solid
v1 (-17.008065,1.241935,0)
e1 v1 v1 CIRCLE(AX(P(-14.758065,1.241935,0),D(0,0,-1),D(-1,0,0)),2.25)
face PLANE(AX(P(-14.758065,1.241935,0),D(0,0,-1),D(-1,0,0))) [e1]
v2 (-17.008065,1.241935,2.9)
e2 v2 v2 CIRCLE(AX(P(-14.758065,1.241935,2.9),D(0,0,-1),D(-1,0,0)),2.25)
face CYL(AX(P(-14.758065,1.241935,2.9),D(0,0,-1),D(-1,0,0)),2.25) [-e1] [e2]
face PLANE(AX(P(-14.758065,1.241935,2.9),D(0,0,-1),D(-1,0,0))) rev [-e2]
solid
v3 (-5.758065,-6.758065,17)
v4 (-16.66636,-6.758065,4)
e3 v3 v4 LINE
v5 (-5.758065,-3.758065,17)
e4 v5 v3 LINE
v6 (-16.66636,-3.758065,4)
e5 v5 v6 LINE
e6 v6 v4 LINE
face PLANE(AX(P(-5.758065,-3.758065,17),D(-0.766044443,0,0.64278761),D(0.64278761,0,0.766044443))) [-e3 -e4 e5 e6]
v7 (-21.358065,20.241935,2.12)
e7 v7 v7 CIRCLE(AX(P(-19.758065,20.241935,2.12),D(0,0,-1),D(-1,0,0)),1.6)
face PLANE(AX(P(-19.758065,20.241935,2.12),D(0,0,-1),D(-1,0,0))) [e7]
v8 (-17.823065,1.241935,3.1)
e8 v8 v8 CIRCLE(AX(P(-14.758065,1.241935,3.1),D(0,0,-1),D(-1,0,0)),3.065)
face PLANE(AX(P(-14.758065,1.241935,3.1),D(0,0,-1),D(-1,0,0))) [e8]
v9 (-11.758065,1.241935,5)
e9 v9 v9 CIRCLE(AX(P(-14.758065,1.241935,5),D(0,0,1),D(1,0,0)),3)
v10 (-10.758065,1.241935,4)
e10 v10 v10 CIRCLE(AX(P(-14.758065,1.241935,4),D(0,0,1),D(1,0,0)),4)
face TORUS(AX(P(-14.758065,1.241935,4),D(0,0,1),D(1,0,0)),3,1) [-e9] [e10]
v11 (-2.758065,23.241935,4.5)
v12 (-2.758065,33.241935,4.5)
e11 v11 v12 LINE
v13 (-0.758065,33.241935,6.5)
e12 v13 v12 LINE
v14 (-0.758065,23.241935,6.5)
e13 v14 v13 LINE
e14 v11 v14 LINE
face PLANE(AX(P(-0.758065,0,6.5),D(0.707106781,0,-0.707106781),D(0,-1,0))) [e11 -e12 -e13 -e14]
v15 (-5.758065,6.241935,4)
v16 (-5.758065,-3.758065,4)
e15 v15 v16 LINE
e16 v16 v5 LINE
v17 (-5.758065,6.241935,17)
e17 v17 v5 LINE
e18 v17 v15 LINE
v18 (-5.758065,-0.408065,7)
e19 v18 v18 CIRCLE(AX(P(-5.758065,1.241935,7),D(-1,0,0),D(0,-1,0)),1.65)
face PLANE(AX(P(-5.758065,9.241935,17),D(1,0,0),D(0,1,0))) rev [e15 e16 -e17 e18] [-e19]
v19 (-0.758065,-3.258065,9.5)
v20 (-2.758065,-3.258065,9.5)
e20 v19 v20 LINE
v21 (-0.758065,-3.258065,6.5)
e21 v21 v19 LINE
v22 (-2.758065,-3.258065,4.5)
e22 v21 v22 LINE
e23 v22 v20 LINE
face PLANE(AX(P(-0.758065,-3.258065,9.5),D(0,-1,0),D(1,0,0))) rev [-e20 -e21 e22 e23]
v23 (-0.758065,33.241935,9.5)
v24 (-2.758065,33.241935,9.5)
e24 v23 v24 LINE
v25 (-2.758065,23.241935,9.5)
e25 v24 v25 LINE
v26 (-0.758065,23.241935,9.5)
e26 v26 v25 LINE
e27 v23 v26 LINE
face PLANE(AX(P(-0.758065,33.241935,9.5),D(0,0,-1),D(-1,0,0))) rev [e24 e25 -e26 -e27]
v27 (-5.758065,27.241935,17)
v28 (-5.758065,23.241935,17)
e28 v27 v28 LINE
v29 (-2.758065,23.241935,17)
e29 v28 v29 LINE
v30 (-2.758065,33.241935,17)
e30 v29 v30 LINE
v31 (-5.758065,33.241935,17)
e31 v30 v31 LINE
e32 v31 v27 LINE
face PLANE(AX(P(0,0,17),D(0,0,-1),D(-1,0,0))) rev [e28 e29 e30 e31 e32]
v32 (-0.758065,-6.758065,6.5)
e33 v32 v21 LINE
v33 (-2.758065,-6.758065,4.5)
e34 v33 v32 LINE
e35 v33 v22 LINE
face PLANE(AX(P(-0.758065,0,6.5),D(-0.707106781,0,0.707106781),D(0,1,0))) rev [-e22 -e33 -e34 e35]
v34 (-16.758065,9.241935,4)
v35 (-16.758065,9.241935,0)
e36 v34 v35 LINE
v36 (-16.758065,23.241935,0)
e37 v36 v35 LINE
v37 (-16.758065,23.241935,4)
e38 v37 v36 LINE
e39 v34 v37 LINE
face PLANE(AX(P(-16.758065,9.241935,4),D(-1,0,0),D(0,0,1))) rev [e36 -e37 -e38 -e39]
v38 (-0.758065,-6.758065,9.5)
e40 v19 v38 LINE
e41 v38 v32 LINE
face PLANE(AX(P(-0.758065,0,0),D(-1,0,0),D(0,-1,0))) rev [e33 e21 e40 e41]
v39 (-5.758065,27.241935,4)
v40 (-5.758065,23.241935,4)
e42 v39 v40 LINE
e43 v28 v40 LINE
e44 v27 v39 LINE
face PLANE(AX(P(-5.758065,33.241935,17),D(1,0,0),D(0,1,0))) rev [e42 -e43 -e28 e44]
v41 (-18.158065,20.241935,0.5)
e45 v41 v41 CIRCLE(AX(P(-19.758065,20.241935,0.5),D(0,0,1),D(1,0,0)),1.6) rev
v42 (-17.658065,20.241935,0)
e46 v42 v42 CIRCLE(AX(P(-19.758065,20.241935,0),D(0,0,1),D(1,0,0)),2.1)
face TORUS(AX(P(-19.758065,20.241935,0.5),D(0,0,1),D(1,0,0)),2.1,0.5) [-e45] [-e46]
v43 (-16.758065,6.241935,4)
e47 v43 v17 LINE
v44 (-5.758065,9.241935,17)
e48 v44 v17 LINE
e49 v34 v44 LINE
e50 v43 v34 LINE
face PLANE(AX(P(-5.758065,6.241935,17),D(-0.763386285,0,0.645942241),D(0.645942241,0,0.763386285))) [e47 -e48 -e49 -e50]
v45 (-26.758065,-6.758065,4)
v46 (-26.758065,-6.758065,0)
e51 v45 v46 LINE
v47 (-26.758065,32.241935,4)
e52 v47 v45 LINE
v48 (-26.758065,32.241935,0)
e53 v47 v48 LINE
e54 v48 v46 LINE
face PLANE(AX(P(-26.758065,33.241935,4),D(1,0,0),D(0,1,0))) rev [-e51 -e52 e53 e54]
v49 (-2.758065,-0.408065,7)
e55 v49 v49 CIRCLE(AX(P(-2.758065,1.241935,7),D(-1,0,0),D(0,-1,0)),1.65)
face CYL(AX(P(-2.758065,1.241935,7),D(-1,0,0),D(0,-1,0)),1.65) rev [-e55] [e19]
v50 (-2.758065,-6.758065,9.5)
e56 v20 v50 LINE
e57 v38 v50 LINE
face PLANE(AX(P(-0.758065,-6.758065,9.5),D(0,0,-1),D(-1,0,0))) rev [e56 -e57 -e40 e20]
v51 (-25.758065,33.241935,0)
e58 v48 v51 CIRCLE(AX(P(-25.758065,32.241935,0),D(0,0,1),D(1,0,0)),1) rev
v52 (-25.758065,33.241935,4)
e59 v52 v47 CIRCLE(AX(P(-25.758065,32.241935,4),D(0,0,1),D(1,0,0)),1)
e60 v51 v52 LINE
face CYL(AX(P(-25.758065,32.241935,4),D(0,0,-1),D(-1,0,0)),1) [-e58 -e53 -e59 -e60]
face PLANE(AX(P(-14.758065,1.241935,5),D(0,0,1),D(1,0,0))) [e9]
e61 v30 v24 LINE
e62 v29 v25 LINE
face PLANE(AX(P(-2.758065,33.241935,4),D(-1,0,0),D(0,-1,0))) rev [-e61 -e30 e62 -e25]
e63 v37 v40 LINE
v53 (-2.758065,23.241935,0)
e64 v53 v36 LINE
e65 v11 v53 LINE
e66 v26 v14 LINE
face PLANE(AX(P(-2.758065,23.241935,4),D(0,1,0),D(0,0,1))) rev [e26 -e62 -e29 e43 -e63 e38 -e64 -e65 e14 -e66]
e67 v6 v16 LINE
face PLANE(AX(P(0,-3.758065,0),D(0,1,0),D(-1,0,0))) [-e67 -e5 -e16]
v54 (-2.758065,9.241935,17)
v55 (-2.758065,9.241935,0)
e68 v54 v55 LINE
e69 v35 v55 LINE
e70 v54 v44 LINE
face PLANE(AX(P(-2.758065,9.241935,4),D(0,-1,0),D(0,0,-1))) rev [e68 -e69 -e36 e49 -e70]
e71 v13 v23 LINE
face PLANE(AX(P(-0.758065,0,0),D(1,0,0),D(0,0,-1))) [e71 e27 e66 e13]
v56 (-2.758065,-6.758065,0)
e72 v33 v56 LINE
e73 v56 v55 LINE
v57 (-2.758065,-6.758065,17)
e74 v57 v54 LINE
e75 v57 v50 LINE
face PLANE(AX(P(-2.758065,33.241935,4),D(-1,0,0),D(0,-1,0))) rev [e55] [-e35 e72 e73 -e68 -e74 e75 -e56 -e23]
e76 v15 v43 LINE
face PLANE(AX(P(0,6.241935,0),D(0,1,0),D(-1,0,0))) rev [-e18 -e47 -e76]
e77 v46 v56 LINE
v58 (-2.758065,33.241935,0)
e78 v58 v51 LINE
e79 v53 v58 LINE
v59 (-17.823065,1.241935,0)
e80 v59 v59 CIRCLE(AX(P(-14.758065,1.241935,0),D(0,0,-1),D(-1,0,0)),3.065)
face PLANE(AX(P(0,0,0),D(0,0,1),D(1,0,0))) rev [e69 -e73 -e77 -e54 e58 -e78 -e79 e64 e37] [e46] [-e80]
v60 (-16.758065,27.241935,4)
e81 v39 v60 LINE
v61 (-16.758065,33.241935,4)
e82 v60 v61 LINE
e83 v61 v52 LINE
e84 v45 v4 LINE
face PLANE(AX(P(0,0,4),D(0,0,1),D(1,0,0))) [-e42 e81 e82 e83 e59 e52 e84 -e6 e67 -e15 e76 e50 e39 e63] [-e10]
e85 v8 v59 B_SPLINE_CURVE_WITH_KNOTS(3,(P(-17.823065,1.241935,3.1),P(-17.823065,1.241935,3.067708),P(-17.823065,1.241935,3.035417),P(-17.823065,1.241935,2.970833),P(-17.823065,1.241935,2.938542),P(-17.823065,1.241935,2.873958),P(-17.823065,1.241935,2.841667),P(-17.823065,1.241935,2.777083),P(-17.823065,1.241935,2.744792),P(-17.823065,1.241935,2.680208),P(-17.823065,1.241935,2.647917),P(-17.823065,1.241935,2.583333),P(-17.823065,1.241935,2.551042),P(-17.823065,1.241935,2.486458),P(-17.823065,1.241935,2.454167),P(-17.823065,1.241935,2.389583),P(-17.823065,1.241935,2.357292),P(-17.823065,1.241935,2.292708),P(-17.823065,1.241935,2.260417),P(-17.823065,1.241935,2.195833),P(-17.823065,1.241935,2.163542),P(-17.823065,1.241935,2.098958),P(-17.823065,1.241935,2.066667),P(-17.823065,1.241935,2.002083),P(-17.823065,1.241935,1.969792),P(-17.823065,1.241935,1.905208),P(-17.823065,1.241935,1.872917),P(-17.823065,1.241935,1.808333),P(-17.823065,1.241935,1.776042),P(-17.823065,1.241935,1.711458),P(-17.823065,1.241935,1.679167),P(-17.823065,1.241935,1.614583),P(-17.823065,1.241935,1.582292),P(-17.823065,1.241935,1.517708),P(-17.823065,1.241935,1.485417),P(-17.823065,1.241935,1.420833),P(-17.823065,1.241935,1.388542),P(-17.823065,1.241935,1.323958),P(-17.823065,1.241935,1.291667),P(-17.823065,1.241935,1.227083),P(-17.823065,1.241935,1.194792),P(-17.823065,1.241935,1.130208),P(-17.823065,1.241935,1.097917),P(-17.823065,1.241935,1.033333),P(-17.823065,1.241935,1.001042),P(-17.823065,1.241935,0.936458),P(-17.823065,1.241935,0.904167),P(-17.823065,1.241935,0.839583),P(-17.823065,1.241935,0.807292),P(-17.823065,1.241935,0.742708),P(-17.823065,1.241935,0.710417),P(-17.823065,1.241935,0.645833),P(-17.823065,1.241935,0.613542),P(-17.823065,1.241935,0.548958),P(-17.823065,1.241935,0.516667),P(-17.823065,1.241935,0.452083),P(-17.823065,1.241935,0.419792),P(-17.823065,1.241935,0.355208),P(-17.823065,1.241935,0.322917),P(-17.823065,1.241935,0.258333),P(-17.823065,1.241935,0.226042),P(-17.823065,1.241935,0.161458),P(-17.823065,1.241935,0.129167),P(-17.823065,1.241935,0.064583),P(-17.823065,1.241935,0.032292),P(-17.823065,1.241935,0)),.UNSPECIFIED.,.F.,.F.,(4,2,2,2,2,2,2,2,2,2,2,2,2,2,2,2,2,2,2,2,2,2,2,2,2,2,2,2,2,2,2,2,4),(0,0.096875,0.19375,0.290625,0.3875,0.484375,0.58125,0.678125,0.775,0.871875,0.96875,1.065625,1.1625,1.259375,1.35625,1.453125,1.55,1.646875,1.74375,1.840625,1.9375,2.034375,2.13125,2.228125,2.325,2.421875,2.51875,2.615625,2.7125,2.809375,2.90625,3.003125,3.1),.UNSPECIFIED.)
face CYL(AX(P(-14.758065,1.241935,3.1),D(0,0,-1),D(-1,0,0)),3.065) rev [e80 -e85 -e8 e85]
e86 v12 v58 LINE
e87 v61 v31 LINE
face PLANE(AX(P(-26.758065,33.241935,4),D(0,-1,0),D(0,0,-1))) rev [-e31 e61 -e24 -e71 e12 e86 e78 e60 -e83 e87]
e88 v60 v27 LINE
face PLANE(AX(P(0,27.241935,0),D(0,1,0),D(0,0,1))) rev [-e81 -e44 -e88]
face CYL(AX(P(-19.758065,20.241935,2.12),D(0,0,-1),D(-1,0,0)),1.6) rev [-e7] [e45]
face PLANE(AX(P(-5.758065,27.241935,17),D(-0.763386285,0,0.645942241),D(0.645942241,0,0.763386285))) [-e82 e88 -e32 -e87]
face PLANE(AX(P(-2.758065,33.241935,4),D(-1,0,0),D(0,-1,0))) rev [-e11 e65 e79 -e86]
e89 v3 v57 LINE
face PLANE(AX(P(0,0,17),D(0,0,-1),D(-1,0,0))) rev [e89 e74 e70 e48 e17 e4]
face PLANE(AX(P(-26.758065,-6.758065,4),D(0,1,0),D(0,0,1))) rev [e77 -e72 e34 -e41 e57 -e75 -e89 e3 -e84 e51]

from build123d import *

# Parameters (mm, degrees)
SKETCH1_W               = 24
SKETCH1_H               = 40
BOSS_EXTRUDE1_DEPTH     = 4
FILLET1_R               = 1
CUT_EXTRUDE2_DEPTH      = 43.860474698
CUT_EXTRUDE2_DEPTH_BACK = 43.860474698
SKETCH3_W               = 14
SKETCH3_H               = 14
SKETCH5_W               = 3
SKETCH5_H               = 16
BOSS_EXTRUDE2_DEPTH     = 13
BOSS_EXTRUDE3_DEPTH     = 3
BOSS_EXTRUDE4_DEPTH     = 3
SKETCH8_R               = 1.65
CUT_EXTRUDE4_DEPTH      = 3
SKETCH9_W               = 3
SKETCH9_H               = 10
BOSS_EXTRUDE5_DEPTH     = 13
BOSS_EXTRUDE6_DEPTH     = 6
SKETCH11_W              = 5
SKETCH11_H              = 10
BOSS_EXTRUDE7_DEPTH     = 2
CHAMFER1_SIZE           = 2
SKETCH12_R              = 3.065
CUT_EXTRUDE5_DEPTH      = 3.1
SKETCH15_R              = 1.6
CUT_EXTRUDE6_DEPTH      = 2.12
SKETCH17_R              = 4
BOSS_EXTRUDE8_DEPTH     = 1
FILLET3_R               = 1
SKETCH21_R              = 2.25
BOSS_EXTRUDE11_DEPTH    = 2.9
SKETCH23_W              = 5
SKETCH23_H              = 3.5
BOSS_EXTRUDE12_DEPTH    = 2
CHAMFER2_SIZE           = 2
FILLET5_R               = 0.5


with BuildPart() as part:
    # Sketch1 → Boss-Extrude1 (new body)
    with BuildSketch(Plane.XY):
        with Locations((-14.758064516, 13.241935484)):
            Rectangle(SKETCH1_W, SKETCH1_H)
    extrude(amount=BOSS_EXTRUDE1_DEPTH)

    # Fillet1
    fillet1_edges = [part.edges().sort_by_distance(p)[0] for p in [
        (-26.758064516, 33.241935484, 2),
    ]]
    fillet(fillet1_edges, radius=FILLET1_R)

    # Sketch3 → Cut-Extrude2 (cut, two sides: drawn at the far end of the back side and taken through both)
    with BuildSketch(Plane(origin=(0, 0, 0), x_dir=(-1, 0, 0), z_dir=(0, 0, -1)).offset(-CUT_EXTRUDE2_DEPTH_BACK)):
        with Locations((9.758064516, 16.241935484)):
            Rectangle(SKETCH3_W, SKETCH3_H)
    extrude(amount=CUT_EXTRUDE2_DEPTH + CUT_EXTRUDE2_DEPTH_BACK, mode=Mode.SUBTRACT)

    # Sketch5 → Boss-Extrude2 (add)
    with BuildSketch(Plane.XY.offset(4)):
        with Locations((-4.258064516, 1.241935484)):
            Rectangle(SKETCH5_W, SKETCH5_H)
    extrude(amount=BOSS_EXTRUDE2_DEPTH)

    # Sketch6 → Boss-Extrude3 (add)
    with BuildSketch(Plane.XZ.offset(6.758064516)):
        Polygon((-5.758064516, 17), (-16.666359721, 4), (-5.758064516, 4), align=None)
    extrude(amount=-BOSS_EXTRUDE3_DEPTH)

    # Sketch7 → Boss-Extrude4 (add)
    with BuildSketch(Plane(origin=(0, 9.241935484, 0), x_dir=(1, 0, 0), z_dir=(0, 1, 0))):
        Polygon((-5.758064516, -17), (-16.758064516, -4), (-5.758064516, -4), align=None)
    extrude(amount=-BOSS_EXTRUDE4_DEPTH)

    # Sketch8 → Cut-Extrude4 (cut)
    with BuildSketch(Plane.ZY.offset(5.758064516)):
        with Locations(Location((7, 1.241935484, 0), (0, 0, 270))):
            Circle(SKETCH8_R)
    extrude(amount=-CUT_EXTRUDE4_DEPTH, mode=Mode.SUBTRACT)

    # Sketch9 → Boss-Extrude5 (add)
    with BuildSketch(Plane.XY.offset(4)):
        with Locations((-4.258064516, 28.241935484)):
            Rectangle(SKETCH9_W, SKETCH9_H)
    extrude(amount=BOSS_EXTRUDE5_DEPTH)

    # Sketch10 → Boss-Extrude6 (add)
    with BuildSketch(Plane(origin=(0, 33.241935484, 0), x_dir=(1, 0, 0), z_dir=(0, 1, 0))):
        Polygon((-5.758064516, -17), (-16.758064516, -4), (-5.758064516, -4), align=None)
    extrude(amount=-BOSS_EXTRUDE6_DEPTH)

    # Sketch11 → Boss-Extrude7 (add)
    with BuildSketch(Plane(origin=(-2.758064516, 0, 0), x_dir=(0, 0, -1), z_dir=(1, 0, 0))):
        with Locations((-7, 28.241935484)):
            Rectangle(SKETCH11_W, SKETCH11_H)
    extrude(amount=BOSS_EXTRUDE7_DEPTH)

    # Chamfer1
    chamfer1_edges = [part.edges().sort_by_distance(p)[0] for p in [
        (-0.758064516, 28.241935484, 4.5),
    ]]
    chamfer(chamfer1_edges, length=CHAMFER1_SIZE - 0.0001)  # a hair under: the kernel refuses the full size

    # Sketch12 → Cut-Extrude5 (cut)
    with BuildSketch(Plane(origin=(0, 0, 0), x_dir=(-1, 0, 0), z_dir=(0, 0, -1))):
        with Locations((14.758064516, 1.241935484)):
            Circle(SKETCH12_R)
    extrude(amount=-CUT_EXTRUDE5_DEPTH, mode=Mode.SUBTRACT)

    # Sketch15 → Cut-Extrude6 (cut)
    with BuildSketch(Plane(origin=(0, 0, 0), x_dir=(-1, 0, 0), z_dir=(0, 0, -1))):
        with Locations((19.758064516, 20.241935484)):
            Circle(SKETCH15_R)
    extrude(amount=-CUT_EXTRUDE6_DEPTH, mode=Mode.SUBTRACT)

    # Sketch17 → Boss-Extrude8 (add)
    with BuildSketch(Plane.XY.offset(4)):
        with Locations((-14.758064516, 1.241935484)):
            Circle(SKETCH17_R)
    extrude(amount=BOSS_EXTRUDE8_DEPTH)

    # Fillet3
    fillet3_edges = [part.edges().sort_by_distance(p)[0] for p in [
        (-18.758064516, 1.241935484, 5),
    ]]
    fillet(fillet3_edges, radius=FILLET3_R - 0.0001)  # a hair under: the kernel refuses the full size

    # Sketch23 → Boss-Extrude12 (add)
    with BuildSketch(Plane(origin=(-2.758064516, 0, 0), x_dir=(0, 0, -1), z_dir=(1, 0, 0))):
        with Locations((-7, -5.008064516)):
            Rectangle(SKETCH23_W, SKETCH23_H)
    extrude(amount=BOSS_EXTRUDE12_DEPTH)

    # Chamfer2
    chamfer2_edges = [part.edges().sort_by_distance(p)[0] for p in [
        (-0.758064516, -5.008064516, 4.5),
    ]]
    chamfer(chamfer2_edges, length=CHAMFER2_SIZE - 0.0001)  # a hair under: the kernel refuses the full size

    # Fillet5
    fillet5_edges = [part.edges().sort_by_distance(p)[0] for p in [
        (-18.158064516, 20.241935484, 0),
    ]]
    fillet(fillet5_edges, radius=FILLET5_R)


with BuildPart() as body_2:
    # Sketch21 → Boss-Extrude11 (new body)
    with BuildSketch(Plane(origin=(0, 0, 0), x_dir=(-1, 0, 0), z_dir=(0, 0, -1))):
        with Locations((14.758064516, 1.241935484)):
            Circle(SKETCH21_R)
    extrude(amount=-BOSS_EXTRUDE11_DEPTH)


solid = Compound([part.part, body_2.part])
